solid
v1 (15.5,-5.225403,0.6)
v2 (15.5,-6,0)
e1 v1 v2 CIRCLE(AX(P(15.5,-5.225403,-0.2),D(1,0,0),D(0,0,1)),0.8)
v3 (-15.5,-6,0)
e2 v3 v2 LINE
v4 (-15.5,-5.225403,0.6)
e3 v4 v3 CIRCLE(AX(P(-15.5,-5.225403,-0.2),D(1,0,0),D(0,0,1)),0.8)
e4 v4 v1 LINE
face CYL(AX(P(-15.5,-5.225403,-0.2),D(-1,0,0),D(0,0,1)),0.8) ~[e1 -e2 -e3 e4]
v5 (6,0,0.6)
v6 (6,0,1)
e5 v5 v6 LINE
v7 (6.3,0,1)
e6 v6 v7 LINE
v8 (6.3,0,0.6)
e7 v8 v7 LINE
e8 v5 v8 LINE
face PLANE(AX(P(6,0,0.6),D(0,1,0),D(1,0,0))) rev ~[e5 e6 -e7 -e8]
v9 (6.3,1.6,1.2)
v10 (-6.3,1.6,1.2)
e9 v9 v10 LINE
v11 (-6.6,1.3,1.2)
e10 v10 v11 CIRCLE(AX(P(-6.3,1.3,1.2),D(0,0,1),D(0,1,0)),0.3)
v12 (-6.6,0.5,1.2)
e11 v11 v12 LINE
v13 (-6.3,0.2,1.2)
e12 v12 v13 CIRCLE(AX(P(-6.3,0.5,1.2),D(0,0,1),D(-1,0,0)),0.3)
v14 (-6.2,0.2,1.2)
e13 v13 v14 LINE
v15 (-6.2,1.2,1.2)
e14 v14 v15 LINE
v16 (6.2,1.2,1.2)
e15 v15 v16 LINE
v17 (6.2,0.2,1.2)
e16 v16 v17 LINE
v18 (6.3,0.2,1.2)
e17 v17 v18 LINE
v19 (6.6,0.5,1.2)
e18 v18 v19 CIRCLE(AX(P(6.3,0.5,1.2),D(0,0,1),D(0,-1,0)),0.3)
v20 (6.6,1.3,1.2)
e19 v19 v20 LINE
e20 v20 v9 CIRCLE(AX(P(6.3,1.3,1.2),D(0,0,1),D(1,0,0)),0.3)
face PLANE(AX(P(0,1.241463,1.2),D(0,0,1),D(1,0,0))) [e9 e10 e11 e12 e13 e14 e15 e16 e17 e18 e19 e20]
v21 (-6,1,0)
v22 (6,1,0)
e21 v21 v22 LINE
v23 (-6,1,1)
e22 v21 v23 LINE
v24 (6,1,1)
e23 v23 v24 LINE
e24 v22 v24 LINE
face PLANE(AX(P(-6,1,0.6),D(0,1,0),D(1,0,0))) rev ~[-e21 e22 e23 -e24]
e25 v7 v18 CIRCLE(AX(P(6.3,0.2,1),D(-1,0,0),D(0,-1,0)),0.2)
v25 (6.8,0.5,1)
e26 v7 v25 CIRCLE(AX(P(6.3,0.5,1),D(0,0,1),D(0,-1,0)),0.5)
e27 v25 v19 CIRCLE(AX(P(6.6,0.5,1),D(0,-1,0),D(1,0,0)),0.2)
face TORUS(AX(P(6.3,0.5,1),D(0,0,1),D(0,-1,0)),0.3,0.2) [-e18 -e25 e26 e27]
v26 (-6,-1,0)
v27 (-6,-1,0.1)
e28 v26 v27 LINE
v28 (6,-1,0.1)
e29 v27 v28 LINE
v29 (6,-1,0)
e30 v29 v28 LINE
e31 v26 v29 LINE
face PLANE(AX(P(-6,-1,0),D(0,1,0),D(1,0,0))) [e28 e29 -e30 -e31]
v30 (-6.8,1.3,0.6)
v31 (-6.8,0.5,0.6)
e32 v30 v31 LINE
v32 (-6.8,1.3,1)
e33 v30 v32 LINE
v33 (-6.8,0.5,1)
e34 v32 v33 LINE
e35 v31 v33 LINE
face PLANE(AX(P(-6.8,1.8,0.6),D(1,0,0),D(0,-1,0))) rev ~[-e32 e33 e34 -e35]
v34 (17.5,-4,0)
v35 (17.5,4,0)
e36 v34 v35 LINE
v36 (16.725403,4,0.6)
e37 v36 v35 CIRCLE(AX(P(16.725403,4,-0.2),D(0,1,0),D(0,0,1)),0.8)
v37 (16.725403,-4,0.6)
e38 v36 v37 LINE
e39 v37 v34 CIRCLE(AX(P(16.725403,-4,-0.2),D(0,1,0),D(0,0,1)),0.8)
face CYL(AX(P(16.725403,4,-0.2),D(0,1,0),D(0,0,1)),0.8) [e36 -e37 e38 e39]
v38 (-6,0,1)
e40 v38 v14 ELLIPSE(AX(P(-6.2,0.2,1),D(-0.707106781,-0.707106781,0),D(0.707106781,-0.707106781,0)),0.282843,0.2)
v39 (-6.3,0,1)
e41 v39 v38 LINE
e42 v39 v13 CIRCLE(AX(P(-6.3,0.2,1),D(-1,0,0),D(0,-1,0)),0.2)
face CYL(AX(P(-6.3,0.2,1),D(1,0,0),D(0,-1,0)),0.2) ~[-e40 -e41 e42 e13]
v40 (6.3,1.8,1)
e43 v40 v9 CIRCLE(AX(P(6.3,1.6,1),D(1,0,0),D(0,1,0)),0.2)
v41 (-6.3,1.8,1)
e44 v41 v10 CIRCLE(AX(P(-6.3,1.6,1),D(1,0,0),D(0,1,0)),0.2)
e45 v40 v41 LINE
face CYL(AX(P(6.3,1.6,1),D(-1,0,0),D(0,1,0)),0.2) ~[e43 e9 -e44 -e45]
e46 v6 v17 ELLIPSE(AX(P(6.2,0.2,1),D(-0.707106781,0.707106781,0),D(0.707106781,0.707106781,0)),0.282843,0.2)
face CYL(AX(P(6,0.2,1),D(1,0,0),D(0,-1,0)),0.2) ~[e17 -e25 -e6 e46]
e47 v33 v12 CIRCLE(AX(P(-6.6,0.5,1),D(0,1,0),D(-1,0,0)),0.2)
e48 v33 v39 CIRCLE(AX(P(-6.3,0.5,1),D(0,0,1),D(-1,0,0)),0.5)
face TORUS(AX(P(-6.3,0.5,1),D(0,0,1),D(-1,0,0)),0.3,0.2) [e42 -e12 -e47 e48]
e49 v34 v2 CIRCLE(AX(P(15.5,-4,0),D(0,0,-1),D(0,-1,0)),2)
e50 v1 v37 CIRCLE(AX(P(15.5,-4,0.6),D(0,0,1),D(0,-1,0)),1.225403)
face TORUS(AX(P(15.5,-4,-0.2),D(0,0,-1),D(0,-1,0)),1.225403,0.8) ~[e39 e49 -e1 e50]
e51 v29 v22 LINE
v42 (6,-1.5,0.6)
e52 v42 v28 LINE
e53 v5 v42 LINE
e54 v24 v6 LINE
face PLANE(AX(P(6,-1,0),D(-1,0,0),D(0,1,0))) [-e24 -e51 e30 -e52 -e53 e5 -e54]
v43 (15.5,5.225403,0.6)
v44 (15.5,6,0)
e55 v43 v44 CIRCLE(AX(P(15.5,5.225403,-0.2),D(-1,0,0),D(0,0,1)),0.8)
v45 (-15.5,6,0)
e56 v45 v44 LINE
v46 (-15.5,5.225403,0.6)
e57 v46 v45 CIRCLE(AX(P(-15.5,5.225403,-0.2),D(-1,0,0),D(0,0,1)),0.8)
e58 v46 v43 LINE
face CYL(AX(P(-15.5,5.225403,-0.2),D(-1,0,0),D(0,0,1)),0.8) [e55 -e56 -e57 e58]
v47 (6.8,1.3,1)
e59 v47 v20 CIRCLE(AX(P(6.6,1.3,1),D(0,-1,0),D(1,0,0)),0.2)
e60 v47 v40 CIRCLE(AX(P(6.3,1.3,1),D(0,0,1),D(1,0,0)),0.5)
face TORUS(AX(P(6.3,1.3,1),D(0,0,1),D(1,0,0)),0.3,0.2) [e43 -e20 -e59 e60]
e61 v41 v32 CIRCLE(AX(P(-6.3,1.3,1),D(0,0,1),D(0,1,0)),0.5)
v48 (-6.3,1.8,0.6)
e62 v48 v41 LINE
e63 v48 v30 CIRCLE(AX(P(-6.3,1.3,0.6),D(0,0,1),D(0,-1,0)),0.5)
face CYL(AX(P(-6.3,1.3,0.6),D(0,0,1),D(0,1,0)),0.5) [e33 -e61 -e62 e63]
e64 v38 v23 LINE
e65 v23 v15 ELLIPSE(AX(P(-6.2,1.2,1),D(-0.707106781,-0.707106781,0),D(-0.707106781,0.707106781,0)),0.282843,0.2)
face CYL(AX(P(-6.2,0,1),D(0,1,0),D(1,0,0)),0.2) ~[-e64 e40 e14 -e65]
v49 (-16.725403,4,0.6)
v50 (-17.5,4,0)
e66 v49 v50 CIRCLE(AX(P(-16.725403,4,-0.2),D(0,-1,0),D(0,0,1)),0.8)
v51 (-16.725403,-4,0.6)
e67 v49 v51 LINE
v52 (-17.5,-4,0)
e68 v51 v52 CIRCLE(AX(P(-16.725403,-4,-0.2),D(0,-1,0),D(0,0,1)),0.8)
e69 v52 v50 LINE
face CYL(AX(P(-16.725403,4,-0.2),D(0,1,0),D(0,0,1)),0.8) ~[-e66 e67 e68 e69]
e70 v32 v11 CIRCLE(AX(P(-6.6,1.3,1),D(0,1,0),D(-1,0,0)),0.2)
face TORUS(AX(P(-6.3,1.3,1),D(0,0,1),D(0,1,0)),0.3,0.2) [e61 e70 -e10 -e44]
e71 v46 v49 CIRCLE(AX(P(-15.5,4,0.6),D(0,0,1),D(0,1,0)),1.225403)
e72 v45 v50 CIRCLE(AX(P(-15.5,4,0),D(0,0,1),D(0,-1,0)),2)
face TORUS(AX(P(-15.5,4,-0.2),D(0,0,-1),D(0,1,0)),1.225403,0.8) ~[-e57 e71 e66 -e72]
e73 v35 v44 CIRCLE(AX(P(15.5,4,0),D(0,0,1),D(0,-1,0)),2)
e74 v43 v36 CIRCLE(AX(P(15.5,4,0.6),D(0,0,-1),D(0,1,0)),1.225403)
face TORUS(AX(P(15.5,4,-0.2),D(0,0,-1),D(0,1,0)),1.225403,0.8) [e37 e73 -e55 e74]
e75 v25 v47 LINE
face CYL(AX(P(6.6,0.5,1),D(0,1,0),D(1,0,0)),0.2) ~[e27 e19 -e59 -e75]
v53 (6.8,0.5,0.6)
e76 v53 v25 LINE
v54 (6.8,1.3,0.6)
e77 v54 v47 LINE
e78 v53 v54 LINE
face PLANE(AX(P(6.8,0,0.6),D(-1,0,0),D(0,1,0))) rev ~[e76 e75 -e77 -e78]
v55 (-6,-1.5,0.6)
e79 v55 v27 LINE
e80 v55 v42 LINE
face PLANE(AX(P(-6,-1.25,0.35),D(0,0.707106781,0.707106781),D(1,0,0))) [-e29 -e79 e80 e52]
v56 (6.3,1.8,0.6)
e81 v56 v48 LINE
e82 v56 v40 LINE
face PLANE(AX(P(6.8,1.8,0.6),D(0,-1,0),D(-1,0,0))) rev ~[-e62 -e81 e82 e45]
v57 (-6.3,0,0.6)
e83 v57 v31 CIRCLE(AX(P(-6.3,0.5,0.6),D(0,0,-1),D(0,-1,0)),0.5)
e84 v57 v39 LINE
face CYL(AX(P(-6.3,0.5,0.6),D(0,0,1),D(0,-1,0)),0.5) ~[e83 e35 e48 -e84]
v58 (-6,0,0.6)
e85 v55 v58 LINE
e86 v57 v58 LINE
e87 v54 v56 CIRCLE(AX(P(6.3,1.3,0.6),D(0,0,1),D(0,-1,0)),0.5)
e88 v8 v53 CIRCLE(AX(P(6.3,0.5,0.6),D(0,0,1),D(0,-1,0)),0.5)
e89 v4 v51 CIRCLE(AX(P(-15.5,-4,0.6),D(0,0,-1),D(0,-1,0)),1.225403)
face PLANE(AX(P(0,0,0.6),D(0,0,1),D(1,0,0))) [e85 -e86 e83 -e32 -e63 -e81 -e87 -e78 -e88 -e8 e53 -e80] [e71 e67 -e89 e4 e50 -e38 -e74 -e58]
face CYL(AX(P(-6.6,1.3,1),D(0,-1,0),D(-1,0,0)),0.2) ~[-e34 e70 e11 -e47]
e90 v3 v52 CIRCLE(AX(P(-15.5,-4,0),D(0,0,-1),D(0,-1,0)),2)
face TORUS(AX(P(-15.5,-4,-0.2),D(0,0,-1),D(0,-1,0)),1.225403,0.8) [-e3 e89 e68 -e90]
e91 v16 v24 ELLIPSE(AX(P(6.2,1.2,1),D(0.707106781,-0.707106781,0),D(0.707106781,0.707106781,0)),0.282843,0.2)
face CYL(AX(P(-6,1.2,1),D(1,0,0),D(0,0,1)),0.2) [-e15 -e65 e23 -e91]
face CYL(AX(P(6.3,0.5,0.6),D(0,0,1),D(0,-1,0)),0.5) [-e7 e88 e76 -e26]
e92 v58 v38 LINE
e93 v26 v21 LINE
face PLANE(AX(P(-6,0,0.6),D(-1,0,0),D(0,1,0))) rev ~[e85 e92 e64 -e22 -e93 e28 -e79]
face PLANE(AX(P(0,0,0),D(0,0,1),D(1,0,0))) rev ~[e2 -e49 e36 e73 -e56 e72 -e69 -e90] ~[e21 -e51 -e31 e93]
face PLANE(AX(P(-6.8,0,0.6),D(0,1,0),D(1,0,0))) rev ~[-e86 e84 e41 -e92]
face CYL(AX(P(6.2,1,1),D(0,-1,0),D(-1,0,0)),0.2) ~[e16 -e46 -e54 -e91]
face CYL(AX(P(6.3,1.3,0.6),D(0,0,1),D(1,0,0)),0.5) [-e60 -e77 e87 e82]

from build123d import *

# Parameters (mm, degrees)
F0_W         = 35
F0_H         = 12
F0_W_2       = 12
F0_H_2       = 2
F1_DEPTH     = 0.6
F3_DEPTH     = 0.6
F4_R         = 2
F5_R         = 0.5
F6_SIZE      = 0.5
F7_T1_DEPTH  = 8
F7_T3_DEPTH  = 31
F7_T6_ANGLE  = 90
F7_T8_ANGLE  = 90
F7_T10_ANGLE = 90
F7_T12_ANGLE = 90
F8_R         = 0.2


# Not quite as in the source:
# - a fillet or chamfer that OpenCascade refuses, or shapes differently, is made with other operations: its cross-section is extruded or revolved along the edge and cut away or added


with BuildPart() as f1:
    # F0 (on Top) → F1 (new body)
    with BuildSketch(Plane.XY):
        Rectangle(F0_W, F0_H)
        Rectangle(F0_W_2, F0_H_2, mode=Mode.SUBTRACT)
    extrude(amount=F1_DEPTH)

    # F2 (on face) → F3 (join)
    with BuildSketch(Plane.XY.offset(0.6)):
        Polygon((-6.8, 0), (-6, 0), (-6, 1), (6, 1), (6, 0), (6.8, 0), (6.8, 1.8), (-6.8, 1.8), align=None)
    extrude(amount=F3_DEPTH)

    # F4
    f4_edges = [f1.edges().sort_by_distance(p)[0] for p in [
        (-17.5, -6, 0.3),
        (-17.5, 6, 0.3),
        (17.5, 6, 0.3),
        (17.5, -6, 0.3),
    ]]
    fillet(f4_edges, radius=F4_R)

    # F5
    f5_edges = [f1.edges().sort_by_distance(p)[0] for p in [
        (6.8, 1.8, 0.9),
        (6.8, 0, 0.9),
        (-6.8, 1.8, 0.9),
        (-6.8, 0, 0.9),
    ]]
    fillet(f5_edges, radius=F5_R)

    # F6
    f6_edges = [f1.edges().sort_by_distance(p)[0] for p in [
        (0, -1, 0.6),
    ]]
    chamfer(f6_edges, length=F6_SIZE)

    # F7: fillet of radius 0.8 on 8 edges, made by hand

    # F7_s2 → F7_t1 (cut)
    with BuildSketch(Plane.XZ.offset(-4)):
        with BuildLine():
            ThreePointArc((16.7254033308, 0.6), (17.2153012793, 0.432455532), (17.5, 0))
            Line((17.5, 0), (17.5, 0.6))
            Line((17.5, 0.6), (16.7254033308, 0.6))
        make_face()
        with BuildLine():
            ThreePointArc((-16.7254033308, 0.6), (-17.2153012793, 0.432455532), (-17.5, 0))
            Line((-17.5, 0), (-17.5, 0.6))
            Line((-17.5, 0.6), (-16.7254033308, 0.6))
        make_face()
    extrude(amount=F7_T1_DEPTH, mode=Mode.SUBTRACT)

    # F7_s4 → F7_t3 (cut)
    with BuildSketch(Plane.YZ.offset(-15.5)):
        with BuildLine():
            ThreePointArc((5.2254033308, 0.6), (5.7153012793, 0.432455532), (6, 0))
            Line((6, 0), (6, 0.6))
            Line((6, 0.6), (5.2254033308, 0.6))
        make_face()
        with BuildLine():
            ThreePointArc((-5.2254033308, 0.6), (-5.7153012793, 0.432455532), (-6, 0))
            Line((-6, 0), (-6, 0.6))
            Line((-6, 0.6), (-5.2254033308, 0.6))
        make_face()
    extrude(amount=F7_T3_DEPTH, mode=Mode.SUBTRACT)

    # F7_s5 → F7_t6 (revolve, cut)
    with BuildSketch(Plane.YZ.offset(15.5)):
        with BuildLine():
            ThreePointArc((5.2254033308, 0.6), (5.7153012793, 0.432455532), (6, 0))
            Line((6, 0), (6, 0.6))
            Line((6, 0.6), (5.2254033308, 0.6))
        make_face()
    revolve(axis=Axis((15.5, 4, 0.6), (0, 0, -1)), revolution_arc=F7_T6_ANGLE, mode=Mode.SUBTRACT)

    # F7_s7 → F7_t8 (revolve, cut)
    with BuildSketch(Plane.YZ.offset(15.5)):
        with BuildLine():
            ThreePointArc((-5.2254033308, 0.6), (-5.7153012793, 0.432455532), (-6, 0))
            Line((-6, 0), (-6, 0.6))
            Line((-6, 0.6), (-5.2254033308, 0.6))
        make_face()
    revolve(axis=Axis((15.5, -4, 0.6), (0, 0, 1)), revolution_arc=F7_T8_ANGLE, mode=Mode.SUBTRACT)

    # F7_s9 → F7_t10 (revolve, cut)
    with BuildSketch(Plane.YZ.offset(-15.5)):
        with BuildLine():
            ThreePointArc((-5.2254033308, 0.6), (-5.7153012793, 0.432455532), (-6, 0))
            Line((-6, 0), (-6, 0.6))
            Line((-6, 0.6), (-5.2254033308, 0.6))
        make_face()
    revolve(axis=Axis((-15.5, -4, 0.6), (0, 0, -1)), revolution_arc=F7_T10_ANGLE, mode=Mode.SUBTRACT)

    # F7_s11 → F7_t12 (revolve, cut)
    with BuildSketch(Plane.YZ.offset(-15.5)):
        with BuildLine():
            ThreePointArc((5.2254033308, 0.6), (5.7153012793, 0.432455532), (6, 0))
            Line((6, 0), (6, 0.6))
            Line((6, 0.6), (5.2254033308, 0.6))
        make_face()
    revolve(axis=Axis((-15.5, 4, 0.6), (0, 0, 1)), revolution_arc=F7_T12_ANGLE, mode=Mode.SUBTRACT)

    # F8
    f8_edges = [f1.edges().sort_by_distance(p)[0] for p in [
        (6.15, 0, 1.2),
        (6.653553, 0.146447, 1.2),
        (6.8, 0.9, 1.2),
        (6.653553, 1.653553, 1.2),
        (0, 1.8, 1.2),
        (-6.653553, 1.653553, 1.2),
        (-6.8, 0.9, 1.2),
        (-6.653553, 0.146447, 1.2),
        (-6.15, 0, 1.2),
        (-6, 0.5, 1.2),
        (0, 1, 1.2),
        (6, 0.5, 1.2),
    ]]
    fillet(f8_edges, radius=F8_R)


solid = f1.part
